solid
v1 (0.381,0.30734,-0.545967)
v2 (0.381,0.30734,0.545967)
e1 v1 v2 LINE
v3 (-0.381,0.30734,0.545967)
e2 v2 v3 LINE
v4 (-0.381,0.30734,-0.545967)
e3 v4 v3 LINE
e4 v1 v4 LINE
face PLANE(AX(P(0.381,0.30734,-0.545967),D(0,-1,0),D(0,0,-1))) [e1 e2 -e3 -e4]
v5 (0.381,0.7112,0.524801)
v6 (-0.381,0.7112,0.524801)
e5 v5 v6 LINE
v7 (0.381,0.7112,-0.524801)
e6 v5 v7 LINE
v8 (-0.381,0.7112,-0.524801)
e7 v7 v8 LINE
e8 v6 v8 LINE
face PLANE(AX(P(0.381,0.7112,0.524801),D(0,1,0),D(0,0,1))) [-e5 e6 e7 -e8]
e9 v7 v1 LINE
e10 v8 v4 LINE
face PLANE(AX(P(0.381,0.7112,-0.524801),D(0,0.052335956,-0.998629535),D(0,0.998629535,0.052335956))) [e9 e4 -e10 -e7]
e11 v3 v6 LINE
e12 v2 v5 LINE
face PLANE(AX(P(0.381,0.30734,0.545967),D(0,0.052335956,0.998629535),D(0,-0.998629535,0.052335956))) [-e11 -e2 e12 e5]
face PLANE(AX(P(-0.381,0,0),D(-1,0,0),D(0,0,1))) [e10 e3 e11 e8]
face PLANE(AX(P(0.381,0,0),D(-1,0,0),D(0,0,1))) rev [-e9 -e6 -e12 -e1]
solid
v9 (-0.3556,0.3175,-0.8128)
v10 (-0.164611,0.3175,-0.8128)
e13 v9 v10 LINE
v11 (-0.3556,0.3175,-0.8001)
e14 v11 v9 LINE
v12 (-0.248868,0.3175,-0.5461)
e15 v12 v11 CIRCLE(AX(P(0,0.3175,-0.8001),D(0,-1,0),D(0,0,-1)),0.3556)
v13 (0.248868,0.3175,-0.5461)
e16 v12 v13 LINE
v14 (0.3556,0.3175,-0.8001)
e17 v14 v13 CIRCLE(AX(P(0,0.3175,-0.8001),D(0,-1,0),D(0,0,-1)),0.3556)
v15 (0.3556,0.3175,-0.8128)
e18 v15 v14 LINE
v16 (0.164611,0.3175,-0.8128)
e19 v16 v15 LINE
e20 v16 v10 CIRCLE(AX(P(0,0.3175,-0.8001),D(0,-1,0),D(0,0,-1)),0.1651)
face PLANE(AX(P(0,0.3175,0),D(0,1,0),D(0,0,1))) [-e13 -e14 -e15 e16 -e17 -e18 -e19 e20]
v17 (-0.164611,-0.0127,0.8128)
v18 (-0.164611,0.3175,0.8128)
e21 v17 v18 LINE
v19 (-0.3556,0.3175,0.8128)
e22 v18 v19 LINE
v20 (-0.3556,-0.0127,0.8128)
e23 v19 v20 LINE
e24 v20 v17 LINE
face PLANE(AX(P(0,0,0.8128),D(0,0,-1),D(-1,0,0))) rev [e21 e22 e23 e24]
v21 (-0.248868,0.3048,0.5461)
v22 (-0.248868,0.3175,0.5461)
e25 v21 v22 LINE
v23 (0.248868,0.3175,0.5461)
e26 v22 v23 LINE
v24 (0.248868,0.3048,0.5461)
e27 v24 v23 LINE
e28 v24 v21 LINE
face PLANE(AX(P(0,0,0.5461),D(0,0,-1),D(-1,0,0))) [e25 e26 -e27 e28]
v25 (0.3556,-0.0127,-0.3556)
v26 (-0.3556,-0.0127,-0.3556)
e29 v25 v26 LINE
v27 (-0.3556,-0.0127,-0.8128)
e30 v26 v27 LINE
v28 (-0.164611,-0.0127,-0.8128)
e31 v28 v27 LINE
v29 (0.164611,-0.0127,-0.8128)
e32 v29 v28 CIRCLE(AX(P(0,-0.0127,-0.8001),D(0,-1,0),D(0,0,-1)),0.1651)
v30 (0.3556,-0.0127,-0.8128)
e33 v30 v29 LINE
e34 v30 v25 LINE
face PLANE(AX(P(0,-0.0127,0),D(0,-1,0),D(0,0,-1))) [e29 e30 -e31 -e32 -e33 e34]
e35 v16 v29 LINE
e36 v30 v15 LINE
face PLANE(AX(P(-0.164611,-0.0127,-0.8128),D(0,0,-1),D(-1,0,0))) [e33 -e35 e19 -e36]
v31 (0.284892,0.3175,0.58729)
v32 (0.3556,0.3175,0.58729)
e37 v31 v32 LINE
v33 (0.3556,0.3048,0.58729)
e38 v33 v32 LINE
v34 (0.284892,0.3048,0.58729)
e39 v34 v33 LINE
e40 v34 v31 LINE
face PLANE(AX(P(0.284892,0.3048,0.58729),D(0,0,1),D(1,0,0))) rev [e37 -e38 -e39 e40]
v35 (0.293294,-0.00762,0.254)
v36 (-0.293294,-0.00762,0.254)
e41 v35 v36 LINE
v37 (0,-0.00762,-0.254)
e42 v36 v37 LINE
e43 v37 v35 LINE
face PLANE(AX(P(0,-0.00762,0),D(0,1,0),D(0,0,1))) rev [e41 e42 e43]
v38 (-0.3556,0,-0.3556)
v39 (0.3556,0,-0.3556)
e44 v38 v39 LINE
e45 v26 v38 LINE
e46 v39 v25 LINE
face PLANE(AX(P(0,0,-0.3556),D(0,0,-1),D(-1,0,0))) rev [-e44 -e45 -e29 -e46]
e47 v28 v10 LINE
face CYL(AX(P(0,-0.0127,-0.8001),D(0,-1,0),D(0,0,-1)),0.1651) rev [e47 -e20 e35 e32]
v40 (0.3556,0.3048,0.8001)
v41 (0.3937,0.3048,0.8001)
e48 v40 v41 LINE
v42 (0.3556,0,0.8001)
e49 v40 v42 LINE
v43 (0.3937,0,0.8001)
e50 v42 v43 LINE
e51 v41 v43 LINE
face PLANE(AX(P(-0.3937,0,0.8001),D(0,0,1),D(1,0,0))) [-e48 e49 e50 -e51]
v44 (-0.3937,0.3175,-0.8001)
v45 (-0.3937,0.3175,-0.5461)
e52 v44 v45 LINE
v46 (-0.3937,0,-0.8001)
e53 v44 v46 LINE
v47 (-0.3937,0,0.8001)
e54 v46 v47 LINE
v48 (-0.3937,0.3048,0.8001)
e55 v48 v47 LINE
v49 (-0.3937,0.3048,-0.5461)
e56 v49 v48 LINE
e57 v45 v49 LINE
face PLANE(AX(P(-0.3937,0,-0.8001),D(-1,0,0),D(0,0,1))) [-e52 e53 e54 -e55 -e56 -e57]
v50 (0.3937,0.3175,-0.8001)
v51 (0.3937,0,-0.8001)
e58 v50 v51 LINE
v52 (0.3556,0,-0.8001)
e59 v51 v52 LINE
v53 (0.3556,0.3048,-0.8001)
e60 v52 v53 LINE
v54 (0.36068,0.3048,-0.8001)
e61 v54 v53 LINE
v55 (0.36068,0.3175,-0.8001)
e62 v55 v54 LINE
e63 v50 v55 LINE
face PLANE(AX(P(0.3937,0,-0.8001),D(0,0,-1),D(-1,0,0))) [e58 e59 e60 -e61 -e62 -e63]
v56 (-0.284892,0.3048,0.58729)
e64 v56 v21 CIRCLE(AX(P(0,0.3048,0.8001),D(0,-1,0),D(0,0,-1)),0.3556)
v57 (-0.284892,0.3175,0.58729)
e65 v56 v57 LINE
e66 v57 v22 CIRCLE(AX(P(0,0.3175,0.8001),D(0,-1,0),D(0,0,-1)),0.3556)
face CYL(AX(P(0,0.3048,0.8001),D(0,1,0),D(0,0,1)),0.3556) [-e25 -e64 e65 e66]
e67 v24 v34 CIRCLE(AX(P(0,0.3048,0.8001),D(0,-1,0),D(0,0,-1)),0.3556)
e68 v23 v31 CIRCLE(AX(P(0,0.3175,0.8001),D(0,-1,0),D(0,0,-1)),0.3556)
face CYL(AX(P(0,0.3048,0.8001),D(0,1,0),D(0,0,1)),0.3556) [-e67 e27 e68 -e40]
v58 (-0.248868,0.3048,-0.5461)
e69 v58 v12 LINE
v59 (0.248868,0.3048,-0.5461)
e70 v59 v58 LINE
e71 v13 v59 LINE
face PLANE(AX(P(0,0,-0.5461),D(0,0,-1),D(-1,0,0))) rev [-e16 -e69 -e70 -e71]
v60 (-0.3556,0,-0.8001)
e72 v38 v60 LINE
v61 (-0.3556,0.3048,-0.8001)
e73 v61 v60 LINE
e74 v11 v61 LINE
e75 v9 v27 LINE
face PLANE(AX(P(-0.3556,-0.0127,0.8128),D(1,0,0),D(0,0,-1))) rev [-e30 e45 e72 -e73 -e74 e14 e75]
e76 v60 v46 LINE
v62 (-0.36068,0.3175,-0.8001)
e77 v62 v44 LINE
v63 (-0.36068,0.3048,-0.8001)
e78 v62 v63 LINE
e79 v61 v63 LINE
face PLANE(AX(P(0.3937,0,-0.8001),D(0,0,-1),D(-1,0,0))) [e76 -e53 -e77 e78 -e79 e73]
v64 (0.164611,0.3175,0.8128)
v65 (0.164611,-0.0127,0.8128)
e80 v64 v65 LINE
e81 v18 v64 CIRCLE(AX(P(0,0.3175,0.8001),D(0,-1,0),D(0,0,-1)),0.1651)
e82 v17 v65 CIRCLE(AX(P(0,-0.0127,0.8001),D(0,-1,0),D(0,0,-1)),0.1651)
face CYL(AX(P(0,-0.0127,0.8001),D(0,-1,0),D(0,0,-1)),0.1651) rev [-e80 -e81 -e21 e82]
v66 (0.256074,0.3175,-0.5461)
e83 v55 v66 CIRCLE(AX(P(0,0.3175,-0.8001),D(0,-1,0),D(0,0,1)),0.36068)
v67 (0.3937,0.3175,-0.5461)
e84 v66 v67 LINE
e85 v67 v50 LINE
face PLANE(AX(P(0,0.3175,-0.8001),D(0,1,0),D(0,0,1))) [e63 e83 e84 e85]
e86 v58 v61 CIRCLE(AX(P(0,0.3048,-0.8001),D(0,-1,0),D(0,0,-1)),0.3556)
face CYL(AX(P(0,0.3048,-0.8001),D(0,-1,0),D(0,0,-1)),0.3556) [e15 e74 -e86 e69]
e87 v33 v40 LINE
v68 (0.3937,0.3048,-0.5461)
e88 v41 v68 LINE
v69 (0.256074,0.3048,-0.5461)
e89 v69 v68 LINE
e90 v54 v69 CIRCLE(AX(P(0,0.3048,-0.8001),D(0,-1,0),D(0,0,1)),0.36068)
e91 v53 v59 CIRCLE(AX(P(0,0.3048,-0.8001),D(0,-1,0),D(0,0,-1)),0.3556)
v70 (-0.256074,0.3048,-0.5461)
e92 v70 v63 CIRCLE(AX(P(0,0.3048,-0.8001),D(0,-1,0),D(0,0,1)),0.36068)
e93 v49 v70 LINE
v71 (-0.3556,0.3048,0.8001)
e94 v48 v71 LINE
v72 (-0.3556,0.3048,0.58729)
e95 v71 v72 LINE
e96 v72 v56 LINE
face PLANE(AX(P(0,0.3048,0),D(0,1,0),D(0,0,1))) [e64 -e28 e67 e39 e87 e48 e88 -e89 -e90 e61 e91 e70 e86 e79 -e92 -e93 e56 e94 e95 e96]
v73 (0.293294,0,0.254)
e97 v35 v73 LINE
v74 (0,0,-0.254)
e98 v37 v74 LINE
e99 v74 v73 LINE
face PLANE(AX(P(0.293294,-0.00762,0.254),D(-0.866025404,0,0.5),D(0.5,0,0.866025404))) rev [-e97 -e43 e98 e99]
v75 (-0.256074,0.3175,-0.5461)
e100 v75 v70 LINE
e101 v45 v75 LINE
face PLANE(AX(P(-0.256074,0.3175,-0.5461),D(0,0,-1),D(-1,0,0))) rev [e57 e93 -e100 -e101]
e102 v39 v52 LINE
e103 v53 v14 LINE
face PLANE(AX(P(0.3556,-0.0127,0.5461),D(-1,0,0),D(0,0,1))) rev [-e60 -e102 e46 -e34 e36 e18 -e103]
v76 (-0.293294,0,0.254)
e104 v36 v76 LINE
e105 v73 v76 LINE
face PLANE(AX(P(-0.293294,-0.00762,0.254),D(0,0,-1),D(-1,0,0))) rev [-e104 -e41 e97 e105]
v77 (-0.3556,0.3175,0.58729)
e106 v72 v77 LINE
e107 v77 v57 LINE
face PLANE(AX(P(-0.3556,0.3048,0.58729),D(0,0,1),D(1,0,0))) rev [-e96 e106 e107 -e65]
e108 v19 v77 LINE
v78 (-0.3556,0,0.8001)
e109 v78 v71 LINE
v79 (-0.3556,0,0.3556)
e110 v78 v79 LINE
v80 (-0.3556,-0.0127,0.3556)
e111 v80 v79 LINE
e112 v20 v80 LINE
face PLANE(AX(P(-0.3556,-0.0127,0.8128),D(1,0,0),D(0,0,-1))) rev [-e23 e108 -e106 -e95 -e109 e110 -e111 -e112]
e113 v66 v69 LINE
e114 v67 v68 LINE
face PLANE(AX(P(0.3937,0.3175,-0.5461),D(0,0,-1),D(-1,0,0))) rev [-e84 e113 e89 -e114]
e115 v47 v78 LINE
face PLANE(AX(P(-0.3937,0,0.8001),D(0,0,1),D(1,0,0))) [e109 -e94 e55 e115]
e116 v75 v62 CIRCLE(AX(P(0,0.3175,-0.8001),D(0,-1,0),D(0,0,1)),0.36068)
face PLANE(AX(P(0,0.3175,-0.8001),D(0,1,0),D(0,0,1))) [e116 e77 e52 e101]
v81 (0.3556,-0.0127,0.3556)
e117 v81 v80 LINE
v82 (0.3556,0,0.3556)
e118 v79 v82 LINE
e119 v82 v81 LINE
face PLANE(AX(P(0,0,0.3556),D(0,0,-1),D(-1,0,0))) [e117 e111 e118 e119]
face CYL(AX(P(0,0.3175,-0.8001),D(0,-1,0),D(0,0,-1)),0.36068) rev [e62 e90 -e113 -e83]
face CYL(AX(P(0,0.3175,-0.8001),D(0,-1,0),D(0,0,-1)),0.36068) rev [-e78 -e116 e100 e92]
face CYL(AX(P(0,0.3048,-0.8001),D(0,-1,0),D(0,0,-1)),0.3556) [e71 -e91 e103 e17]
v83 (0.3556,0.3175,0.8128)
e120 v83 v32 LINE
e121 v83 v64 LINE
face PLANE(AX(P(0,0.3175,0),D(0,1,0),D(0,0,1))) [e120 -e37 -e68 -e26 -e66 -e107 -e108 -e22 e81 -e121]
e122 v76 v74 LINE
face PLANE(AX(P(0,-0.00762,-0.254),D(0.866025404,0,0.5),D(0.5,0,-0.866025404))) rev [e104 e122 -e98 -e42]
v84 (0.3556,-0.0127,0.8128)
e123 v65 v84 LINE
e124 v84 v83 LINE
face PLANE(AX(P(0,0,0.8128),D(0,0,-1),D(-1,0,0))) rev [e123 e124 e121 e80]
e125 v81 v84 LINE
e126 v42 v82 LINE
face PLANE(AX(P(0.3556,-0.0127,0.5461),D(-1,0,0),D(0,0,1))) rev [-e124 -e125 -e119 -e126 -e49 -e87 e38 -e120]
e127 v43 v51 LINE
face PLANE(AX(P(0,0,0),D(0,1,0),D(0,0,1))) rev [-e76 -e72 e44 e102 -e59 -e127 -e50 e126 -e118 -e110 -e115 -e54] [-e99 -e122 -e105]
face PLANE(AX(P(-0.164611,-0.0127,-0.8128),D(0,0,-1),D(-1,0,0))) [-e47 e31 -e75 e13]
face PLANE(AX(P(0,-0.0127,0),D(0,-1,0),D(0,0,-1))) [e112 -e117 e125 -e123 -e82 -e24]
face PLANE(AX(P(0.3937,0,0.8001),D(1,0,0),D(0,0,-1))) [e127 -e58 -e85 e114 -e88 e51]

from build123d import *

# Parameters (mm, degrees)
BOSS_EXTRUDE1_DEPTH   = 0.3048
BOSS_EXTRUDE1_START   = -0.0127
BOSS_EXTRUDE1_2_DEPTH = 0.3302
BOSS_EXTRUDE1_3_DEPTH = 0.0127
SKETCH2_W             = 0.7112
SKETCH2_H             = 0.0127
CUT_EXTRUDE1_DEPTH    = 0.7112
SKETCH3_W             = 0.7112
SKETCH3_H             = 0.0127
CUT_EXTRUDE2_DEPTH    = 1.0922
BOSS_EXTRUDE2_DEPTH   = 0.0127
BOSS_EXTRUDE3_DEPTH   = 0.0127
CUT_EXTRUDE3_DEPTH    = 0.0127
CUT_EXTRUDE4_DEPTH    = 0.0127
BOSS_EXTRUDE4_DEPTH   = 0.00762
HOLE1_D               = 0.3302
BOSS_EXTRUDE5_DEPTH   = 0.762


with BuildPart() as part:
    # Boss-Extrude1: read off the stored shape, not the designer's step
    # Boss-Extrude1 outline → Boss-Extrude1 (new body)
    with BuildSketch(Plane(origin=(0, 0, 0), x_dir=(1, 0, 0), z_dir=(0, 1, 0))):
        Polygon((-0.3937, -0.8001), (-0.3556, -0.8001), (-0.3556, -0.8128), (0.3556, -0.8128), (0.3556, -0.8001), (0.3937, -0.8001), (0.3937, 0.8001), (0.3556, 0.8001), (0.3556, 0.8128), (-0.3556, 0.8128), (-0.3556, 0.8001), (-0.3937, 0.8001), align=None)
    extrude(amount=BOSS_EXTRUDE1_DEPTH)

    # Boss-Extrude1 2 outline → Boss-Extrude1 2 (add)
    with BuildSketch(Plane(origin=(0, 0, 0), x_dir=(1, 0, 0), z_dir=(0, 1, 0)).offset(BOSS_EXTRUDE1_START)):
        with BuildLine():
            Line((-0.3556, 0.8128), (-0.3556, 0.8001))
            ThreePointArc((-0.3556, 0.8001), (-0.327832943, 0.662343252), (-0.248868158, 0.5461))
            Line((-0.248868158, 0.5461), (-0.3556, 0.5461))
            Line((-0.3556, 0.5461), (-0.3556, -0.8128))
            Line((-0.3556, -0.8128), (0.3556, -0.8128))
            Line((0.3556, -0.8128), (0.3556, 0.5461))
            Line((0.3556, 0.5461), (0.248868158, 0.5461))
            ThreePointArc((0.248868158, 0.5461), (0.327832943, 0.662343252), (0.3556, 0.8001))
            Line((0.3556, 0.8001), (0.3556, 0.8128))
            Line((0.3556, 0.8128), (-0.3556, 0.8128))
        make_face()
    extrude(amount=BOSS_EXTRUDE1_2_DEPTH)

    # Boss-Extrude1 3 outline → Boss-Extrude1 3 (add)
    with BuildSketch(Plane(origin=(0, 0, 0), x_dir=(1, 0, 0), z_dir=(0, 1, 0)).offset(BOSS_EXTRUDE1_START)):
        with BuildLine():
            ThreePointArc((-0.248868158, 0.5461), (-0.327832943, 0.662343252), (-0.3556, 0.8001))
            Line((-0.3556, 0.8001), (-0.3556, 0.5461))
            Line((-0.3556, 0.5461), (-0.248868158, 0.5461))
        make_face()
        with BuildLine():
            Line((0.3556, 0.5461), (0.3556, 0.8001))
            ThreePointArc((0.3556, 0.8001), (0.327832943, 0.662343252), (0.248868158, 0.5461))
            Line((0.248868158, 0.5461), (0.3556, 0.5461))
        make_face()
    extrude(amount=BOSS_EXTRUDE1_3_DEPTH)

    # Sketch2 → Cut-Extrude1 (cut)
    with BuildSketch(Plane(origin=(0, 0, -0.3556), x_dir=(-1, 0, 0), z_dir=(0, 0, -1))):
        with Locations((0, -0.00635)):
            Rectangle(SKETCH2_W, SKETCH2_H)
    extrude(amount=-CUT_EXTRUDE1_DEPTH, mode=Mode.SUBTRACT)

    # Sketch3 → Cut-Extrude2 (cut)
    with BuildSketch(Plane(origin=(0, 0, -0.5461), x_dir=(-1, 0, 0), z_dir=(0, 0, -1))):
        with Locations((0, 0.31115)):
            Rectangle(SKETCH3_W, SKETCH3_H)
    extrude(amount=-CUT_EXTRUDE2_DEPTH, mode=Mode.SUBTRACT)

    # Sketch4 → Boss-Extrude2 (add)
    with BuildSketch(Plane(origin=(0, 0.3048, 0), x_dir=(-1, 0, 0), z_dir=(0, 1, 0))):
        with BuildLine():
            Line((-0.3937, -0.5461), (-0.25607433, -0.5461))
            ThreePointArc((-0.25607433, -0.5461), (-0.333504836, -0.662751587), (-0.36068, -0.8001))
            Line((-0.36068, -0.8001), (-0.3937, -0.8001))
            Line((-0.3937, -0.8001), (-0.3937, -0.5461))
        make_face()
    extrude(amount=BOSS_EXTRUDE2_DEPTH)

    # Sketch5 → Boss-Extrude3 (add)
    with BuildSketch(Plane(origin=(0, 0.3048, 0), x_dir=(-1, 0, 0), z_dir=(0, 1, 0))):
        with BuildLine():
            Line((0.25607433, -0.5461), (0.3937, -0.5461))
            Line((0.3937, -0.5461), (0.3937, -0.8001))
            Line((0.3937, -0.8001), (0.36068, -0.8001))
            ThreePointArc((0.36068, -0.8001), (0.333504836, -0.662751587), (0.25607433, -0.5461))
        make_face()
    extrude(amount=BOSS_EXTRUDE3_DEPTH)

    # Sketch6 → Cut-Extrude3 (cut)
    with BuildSketch(Plane(origin=(0, 0.3175, 0), x_dir=(-1, 0, 0), z_dir=(0, 1, 0))):
        with BuildLine():
            Line((0.3556, 0.5461), (0.3556, 0.587289823))
            Line((0.3556, 0.587289823), (0.284891538, 0.587289823))
            ThreePointArc((0.284891538, 0.587289823), (0.267673315, 0.566000969), (0.248868158, 0.5461))
            Line((0.248868158, 0.5461), (0.3556, 0.5461))
        make_face()
    extrude(amount=-CUT_EXTRUDE3_DEPTH, mode=Mode.SUBTRACT)

    # Sketch7 → Cut-Extrude4 (cut)
    with BuildSketch(Plane(origin=(0, 0.3175, 0), x_dir=(-1, 0, 0), z_dir=(0, 1, 0))):
        with BuildLine():
            Line((-0.284891538, 0.587289823), (-0.3556, 0.587289823))
            Line((-0.3556, 0.587289823), (-0.3556, 0.5461))
            Line((-0.3556, 0.5461), (-0.248868158, 0.5461))
            ThreePointArc((-0.248868158, 0.5461), (-0.267673315, 0.566000969), (-0.284891538, 0.587289823))
        make_face()
    extrude(amount=-CUT_EXTRUDE4_DEPTH, mode=Mode.SUBTRACT)

    # Sketch8 → Boss-Extrude4 (add)
    with BuildSketch(Plane.XZ):
        Polygon((0, -0.254), (-0.293293937, 0.254), (0.293293937, 0.254), align=None)
    extrude(amount=BOSS_EXTRUDE4_DEPTH)

    # Hole1 (through all)
    with Locations(Plane(origin=(0, -0.0127, 0), x_dir=(-1, 0, 0), z_dir=(0, -1, 0))):
        with Locations((0, 0.8001), (0, -0.8001)):
            Hole(HOLE1_D / 2)


with BuildPart() as body_2:
    # Sketch15 → Boss-Extrude5 (new body)
    with BuildSketch(Plane.ZY.offset(0.381)):
        Polygon((-0.524801478, 0.7112), (-0.545966884, 0.30734), (0.545966884, 0.30734), (0.524801478, 0.7112), align=None)
    extrude(amount=-BOSS_EXTRUDE5_DEPTH)


solid = Compound([part.part, body_2.part])
